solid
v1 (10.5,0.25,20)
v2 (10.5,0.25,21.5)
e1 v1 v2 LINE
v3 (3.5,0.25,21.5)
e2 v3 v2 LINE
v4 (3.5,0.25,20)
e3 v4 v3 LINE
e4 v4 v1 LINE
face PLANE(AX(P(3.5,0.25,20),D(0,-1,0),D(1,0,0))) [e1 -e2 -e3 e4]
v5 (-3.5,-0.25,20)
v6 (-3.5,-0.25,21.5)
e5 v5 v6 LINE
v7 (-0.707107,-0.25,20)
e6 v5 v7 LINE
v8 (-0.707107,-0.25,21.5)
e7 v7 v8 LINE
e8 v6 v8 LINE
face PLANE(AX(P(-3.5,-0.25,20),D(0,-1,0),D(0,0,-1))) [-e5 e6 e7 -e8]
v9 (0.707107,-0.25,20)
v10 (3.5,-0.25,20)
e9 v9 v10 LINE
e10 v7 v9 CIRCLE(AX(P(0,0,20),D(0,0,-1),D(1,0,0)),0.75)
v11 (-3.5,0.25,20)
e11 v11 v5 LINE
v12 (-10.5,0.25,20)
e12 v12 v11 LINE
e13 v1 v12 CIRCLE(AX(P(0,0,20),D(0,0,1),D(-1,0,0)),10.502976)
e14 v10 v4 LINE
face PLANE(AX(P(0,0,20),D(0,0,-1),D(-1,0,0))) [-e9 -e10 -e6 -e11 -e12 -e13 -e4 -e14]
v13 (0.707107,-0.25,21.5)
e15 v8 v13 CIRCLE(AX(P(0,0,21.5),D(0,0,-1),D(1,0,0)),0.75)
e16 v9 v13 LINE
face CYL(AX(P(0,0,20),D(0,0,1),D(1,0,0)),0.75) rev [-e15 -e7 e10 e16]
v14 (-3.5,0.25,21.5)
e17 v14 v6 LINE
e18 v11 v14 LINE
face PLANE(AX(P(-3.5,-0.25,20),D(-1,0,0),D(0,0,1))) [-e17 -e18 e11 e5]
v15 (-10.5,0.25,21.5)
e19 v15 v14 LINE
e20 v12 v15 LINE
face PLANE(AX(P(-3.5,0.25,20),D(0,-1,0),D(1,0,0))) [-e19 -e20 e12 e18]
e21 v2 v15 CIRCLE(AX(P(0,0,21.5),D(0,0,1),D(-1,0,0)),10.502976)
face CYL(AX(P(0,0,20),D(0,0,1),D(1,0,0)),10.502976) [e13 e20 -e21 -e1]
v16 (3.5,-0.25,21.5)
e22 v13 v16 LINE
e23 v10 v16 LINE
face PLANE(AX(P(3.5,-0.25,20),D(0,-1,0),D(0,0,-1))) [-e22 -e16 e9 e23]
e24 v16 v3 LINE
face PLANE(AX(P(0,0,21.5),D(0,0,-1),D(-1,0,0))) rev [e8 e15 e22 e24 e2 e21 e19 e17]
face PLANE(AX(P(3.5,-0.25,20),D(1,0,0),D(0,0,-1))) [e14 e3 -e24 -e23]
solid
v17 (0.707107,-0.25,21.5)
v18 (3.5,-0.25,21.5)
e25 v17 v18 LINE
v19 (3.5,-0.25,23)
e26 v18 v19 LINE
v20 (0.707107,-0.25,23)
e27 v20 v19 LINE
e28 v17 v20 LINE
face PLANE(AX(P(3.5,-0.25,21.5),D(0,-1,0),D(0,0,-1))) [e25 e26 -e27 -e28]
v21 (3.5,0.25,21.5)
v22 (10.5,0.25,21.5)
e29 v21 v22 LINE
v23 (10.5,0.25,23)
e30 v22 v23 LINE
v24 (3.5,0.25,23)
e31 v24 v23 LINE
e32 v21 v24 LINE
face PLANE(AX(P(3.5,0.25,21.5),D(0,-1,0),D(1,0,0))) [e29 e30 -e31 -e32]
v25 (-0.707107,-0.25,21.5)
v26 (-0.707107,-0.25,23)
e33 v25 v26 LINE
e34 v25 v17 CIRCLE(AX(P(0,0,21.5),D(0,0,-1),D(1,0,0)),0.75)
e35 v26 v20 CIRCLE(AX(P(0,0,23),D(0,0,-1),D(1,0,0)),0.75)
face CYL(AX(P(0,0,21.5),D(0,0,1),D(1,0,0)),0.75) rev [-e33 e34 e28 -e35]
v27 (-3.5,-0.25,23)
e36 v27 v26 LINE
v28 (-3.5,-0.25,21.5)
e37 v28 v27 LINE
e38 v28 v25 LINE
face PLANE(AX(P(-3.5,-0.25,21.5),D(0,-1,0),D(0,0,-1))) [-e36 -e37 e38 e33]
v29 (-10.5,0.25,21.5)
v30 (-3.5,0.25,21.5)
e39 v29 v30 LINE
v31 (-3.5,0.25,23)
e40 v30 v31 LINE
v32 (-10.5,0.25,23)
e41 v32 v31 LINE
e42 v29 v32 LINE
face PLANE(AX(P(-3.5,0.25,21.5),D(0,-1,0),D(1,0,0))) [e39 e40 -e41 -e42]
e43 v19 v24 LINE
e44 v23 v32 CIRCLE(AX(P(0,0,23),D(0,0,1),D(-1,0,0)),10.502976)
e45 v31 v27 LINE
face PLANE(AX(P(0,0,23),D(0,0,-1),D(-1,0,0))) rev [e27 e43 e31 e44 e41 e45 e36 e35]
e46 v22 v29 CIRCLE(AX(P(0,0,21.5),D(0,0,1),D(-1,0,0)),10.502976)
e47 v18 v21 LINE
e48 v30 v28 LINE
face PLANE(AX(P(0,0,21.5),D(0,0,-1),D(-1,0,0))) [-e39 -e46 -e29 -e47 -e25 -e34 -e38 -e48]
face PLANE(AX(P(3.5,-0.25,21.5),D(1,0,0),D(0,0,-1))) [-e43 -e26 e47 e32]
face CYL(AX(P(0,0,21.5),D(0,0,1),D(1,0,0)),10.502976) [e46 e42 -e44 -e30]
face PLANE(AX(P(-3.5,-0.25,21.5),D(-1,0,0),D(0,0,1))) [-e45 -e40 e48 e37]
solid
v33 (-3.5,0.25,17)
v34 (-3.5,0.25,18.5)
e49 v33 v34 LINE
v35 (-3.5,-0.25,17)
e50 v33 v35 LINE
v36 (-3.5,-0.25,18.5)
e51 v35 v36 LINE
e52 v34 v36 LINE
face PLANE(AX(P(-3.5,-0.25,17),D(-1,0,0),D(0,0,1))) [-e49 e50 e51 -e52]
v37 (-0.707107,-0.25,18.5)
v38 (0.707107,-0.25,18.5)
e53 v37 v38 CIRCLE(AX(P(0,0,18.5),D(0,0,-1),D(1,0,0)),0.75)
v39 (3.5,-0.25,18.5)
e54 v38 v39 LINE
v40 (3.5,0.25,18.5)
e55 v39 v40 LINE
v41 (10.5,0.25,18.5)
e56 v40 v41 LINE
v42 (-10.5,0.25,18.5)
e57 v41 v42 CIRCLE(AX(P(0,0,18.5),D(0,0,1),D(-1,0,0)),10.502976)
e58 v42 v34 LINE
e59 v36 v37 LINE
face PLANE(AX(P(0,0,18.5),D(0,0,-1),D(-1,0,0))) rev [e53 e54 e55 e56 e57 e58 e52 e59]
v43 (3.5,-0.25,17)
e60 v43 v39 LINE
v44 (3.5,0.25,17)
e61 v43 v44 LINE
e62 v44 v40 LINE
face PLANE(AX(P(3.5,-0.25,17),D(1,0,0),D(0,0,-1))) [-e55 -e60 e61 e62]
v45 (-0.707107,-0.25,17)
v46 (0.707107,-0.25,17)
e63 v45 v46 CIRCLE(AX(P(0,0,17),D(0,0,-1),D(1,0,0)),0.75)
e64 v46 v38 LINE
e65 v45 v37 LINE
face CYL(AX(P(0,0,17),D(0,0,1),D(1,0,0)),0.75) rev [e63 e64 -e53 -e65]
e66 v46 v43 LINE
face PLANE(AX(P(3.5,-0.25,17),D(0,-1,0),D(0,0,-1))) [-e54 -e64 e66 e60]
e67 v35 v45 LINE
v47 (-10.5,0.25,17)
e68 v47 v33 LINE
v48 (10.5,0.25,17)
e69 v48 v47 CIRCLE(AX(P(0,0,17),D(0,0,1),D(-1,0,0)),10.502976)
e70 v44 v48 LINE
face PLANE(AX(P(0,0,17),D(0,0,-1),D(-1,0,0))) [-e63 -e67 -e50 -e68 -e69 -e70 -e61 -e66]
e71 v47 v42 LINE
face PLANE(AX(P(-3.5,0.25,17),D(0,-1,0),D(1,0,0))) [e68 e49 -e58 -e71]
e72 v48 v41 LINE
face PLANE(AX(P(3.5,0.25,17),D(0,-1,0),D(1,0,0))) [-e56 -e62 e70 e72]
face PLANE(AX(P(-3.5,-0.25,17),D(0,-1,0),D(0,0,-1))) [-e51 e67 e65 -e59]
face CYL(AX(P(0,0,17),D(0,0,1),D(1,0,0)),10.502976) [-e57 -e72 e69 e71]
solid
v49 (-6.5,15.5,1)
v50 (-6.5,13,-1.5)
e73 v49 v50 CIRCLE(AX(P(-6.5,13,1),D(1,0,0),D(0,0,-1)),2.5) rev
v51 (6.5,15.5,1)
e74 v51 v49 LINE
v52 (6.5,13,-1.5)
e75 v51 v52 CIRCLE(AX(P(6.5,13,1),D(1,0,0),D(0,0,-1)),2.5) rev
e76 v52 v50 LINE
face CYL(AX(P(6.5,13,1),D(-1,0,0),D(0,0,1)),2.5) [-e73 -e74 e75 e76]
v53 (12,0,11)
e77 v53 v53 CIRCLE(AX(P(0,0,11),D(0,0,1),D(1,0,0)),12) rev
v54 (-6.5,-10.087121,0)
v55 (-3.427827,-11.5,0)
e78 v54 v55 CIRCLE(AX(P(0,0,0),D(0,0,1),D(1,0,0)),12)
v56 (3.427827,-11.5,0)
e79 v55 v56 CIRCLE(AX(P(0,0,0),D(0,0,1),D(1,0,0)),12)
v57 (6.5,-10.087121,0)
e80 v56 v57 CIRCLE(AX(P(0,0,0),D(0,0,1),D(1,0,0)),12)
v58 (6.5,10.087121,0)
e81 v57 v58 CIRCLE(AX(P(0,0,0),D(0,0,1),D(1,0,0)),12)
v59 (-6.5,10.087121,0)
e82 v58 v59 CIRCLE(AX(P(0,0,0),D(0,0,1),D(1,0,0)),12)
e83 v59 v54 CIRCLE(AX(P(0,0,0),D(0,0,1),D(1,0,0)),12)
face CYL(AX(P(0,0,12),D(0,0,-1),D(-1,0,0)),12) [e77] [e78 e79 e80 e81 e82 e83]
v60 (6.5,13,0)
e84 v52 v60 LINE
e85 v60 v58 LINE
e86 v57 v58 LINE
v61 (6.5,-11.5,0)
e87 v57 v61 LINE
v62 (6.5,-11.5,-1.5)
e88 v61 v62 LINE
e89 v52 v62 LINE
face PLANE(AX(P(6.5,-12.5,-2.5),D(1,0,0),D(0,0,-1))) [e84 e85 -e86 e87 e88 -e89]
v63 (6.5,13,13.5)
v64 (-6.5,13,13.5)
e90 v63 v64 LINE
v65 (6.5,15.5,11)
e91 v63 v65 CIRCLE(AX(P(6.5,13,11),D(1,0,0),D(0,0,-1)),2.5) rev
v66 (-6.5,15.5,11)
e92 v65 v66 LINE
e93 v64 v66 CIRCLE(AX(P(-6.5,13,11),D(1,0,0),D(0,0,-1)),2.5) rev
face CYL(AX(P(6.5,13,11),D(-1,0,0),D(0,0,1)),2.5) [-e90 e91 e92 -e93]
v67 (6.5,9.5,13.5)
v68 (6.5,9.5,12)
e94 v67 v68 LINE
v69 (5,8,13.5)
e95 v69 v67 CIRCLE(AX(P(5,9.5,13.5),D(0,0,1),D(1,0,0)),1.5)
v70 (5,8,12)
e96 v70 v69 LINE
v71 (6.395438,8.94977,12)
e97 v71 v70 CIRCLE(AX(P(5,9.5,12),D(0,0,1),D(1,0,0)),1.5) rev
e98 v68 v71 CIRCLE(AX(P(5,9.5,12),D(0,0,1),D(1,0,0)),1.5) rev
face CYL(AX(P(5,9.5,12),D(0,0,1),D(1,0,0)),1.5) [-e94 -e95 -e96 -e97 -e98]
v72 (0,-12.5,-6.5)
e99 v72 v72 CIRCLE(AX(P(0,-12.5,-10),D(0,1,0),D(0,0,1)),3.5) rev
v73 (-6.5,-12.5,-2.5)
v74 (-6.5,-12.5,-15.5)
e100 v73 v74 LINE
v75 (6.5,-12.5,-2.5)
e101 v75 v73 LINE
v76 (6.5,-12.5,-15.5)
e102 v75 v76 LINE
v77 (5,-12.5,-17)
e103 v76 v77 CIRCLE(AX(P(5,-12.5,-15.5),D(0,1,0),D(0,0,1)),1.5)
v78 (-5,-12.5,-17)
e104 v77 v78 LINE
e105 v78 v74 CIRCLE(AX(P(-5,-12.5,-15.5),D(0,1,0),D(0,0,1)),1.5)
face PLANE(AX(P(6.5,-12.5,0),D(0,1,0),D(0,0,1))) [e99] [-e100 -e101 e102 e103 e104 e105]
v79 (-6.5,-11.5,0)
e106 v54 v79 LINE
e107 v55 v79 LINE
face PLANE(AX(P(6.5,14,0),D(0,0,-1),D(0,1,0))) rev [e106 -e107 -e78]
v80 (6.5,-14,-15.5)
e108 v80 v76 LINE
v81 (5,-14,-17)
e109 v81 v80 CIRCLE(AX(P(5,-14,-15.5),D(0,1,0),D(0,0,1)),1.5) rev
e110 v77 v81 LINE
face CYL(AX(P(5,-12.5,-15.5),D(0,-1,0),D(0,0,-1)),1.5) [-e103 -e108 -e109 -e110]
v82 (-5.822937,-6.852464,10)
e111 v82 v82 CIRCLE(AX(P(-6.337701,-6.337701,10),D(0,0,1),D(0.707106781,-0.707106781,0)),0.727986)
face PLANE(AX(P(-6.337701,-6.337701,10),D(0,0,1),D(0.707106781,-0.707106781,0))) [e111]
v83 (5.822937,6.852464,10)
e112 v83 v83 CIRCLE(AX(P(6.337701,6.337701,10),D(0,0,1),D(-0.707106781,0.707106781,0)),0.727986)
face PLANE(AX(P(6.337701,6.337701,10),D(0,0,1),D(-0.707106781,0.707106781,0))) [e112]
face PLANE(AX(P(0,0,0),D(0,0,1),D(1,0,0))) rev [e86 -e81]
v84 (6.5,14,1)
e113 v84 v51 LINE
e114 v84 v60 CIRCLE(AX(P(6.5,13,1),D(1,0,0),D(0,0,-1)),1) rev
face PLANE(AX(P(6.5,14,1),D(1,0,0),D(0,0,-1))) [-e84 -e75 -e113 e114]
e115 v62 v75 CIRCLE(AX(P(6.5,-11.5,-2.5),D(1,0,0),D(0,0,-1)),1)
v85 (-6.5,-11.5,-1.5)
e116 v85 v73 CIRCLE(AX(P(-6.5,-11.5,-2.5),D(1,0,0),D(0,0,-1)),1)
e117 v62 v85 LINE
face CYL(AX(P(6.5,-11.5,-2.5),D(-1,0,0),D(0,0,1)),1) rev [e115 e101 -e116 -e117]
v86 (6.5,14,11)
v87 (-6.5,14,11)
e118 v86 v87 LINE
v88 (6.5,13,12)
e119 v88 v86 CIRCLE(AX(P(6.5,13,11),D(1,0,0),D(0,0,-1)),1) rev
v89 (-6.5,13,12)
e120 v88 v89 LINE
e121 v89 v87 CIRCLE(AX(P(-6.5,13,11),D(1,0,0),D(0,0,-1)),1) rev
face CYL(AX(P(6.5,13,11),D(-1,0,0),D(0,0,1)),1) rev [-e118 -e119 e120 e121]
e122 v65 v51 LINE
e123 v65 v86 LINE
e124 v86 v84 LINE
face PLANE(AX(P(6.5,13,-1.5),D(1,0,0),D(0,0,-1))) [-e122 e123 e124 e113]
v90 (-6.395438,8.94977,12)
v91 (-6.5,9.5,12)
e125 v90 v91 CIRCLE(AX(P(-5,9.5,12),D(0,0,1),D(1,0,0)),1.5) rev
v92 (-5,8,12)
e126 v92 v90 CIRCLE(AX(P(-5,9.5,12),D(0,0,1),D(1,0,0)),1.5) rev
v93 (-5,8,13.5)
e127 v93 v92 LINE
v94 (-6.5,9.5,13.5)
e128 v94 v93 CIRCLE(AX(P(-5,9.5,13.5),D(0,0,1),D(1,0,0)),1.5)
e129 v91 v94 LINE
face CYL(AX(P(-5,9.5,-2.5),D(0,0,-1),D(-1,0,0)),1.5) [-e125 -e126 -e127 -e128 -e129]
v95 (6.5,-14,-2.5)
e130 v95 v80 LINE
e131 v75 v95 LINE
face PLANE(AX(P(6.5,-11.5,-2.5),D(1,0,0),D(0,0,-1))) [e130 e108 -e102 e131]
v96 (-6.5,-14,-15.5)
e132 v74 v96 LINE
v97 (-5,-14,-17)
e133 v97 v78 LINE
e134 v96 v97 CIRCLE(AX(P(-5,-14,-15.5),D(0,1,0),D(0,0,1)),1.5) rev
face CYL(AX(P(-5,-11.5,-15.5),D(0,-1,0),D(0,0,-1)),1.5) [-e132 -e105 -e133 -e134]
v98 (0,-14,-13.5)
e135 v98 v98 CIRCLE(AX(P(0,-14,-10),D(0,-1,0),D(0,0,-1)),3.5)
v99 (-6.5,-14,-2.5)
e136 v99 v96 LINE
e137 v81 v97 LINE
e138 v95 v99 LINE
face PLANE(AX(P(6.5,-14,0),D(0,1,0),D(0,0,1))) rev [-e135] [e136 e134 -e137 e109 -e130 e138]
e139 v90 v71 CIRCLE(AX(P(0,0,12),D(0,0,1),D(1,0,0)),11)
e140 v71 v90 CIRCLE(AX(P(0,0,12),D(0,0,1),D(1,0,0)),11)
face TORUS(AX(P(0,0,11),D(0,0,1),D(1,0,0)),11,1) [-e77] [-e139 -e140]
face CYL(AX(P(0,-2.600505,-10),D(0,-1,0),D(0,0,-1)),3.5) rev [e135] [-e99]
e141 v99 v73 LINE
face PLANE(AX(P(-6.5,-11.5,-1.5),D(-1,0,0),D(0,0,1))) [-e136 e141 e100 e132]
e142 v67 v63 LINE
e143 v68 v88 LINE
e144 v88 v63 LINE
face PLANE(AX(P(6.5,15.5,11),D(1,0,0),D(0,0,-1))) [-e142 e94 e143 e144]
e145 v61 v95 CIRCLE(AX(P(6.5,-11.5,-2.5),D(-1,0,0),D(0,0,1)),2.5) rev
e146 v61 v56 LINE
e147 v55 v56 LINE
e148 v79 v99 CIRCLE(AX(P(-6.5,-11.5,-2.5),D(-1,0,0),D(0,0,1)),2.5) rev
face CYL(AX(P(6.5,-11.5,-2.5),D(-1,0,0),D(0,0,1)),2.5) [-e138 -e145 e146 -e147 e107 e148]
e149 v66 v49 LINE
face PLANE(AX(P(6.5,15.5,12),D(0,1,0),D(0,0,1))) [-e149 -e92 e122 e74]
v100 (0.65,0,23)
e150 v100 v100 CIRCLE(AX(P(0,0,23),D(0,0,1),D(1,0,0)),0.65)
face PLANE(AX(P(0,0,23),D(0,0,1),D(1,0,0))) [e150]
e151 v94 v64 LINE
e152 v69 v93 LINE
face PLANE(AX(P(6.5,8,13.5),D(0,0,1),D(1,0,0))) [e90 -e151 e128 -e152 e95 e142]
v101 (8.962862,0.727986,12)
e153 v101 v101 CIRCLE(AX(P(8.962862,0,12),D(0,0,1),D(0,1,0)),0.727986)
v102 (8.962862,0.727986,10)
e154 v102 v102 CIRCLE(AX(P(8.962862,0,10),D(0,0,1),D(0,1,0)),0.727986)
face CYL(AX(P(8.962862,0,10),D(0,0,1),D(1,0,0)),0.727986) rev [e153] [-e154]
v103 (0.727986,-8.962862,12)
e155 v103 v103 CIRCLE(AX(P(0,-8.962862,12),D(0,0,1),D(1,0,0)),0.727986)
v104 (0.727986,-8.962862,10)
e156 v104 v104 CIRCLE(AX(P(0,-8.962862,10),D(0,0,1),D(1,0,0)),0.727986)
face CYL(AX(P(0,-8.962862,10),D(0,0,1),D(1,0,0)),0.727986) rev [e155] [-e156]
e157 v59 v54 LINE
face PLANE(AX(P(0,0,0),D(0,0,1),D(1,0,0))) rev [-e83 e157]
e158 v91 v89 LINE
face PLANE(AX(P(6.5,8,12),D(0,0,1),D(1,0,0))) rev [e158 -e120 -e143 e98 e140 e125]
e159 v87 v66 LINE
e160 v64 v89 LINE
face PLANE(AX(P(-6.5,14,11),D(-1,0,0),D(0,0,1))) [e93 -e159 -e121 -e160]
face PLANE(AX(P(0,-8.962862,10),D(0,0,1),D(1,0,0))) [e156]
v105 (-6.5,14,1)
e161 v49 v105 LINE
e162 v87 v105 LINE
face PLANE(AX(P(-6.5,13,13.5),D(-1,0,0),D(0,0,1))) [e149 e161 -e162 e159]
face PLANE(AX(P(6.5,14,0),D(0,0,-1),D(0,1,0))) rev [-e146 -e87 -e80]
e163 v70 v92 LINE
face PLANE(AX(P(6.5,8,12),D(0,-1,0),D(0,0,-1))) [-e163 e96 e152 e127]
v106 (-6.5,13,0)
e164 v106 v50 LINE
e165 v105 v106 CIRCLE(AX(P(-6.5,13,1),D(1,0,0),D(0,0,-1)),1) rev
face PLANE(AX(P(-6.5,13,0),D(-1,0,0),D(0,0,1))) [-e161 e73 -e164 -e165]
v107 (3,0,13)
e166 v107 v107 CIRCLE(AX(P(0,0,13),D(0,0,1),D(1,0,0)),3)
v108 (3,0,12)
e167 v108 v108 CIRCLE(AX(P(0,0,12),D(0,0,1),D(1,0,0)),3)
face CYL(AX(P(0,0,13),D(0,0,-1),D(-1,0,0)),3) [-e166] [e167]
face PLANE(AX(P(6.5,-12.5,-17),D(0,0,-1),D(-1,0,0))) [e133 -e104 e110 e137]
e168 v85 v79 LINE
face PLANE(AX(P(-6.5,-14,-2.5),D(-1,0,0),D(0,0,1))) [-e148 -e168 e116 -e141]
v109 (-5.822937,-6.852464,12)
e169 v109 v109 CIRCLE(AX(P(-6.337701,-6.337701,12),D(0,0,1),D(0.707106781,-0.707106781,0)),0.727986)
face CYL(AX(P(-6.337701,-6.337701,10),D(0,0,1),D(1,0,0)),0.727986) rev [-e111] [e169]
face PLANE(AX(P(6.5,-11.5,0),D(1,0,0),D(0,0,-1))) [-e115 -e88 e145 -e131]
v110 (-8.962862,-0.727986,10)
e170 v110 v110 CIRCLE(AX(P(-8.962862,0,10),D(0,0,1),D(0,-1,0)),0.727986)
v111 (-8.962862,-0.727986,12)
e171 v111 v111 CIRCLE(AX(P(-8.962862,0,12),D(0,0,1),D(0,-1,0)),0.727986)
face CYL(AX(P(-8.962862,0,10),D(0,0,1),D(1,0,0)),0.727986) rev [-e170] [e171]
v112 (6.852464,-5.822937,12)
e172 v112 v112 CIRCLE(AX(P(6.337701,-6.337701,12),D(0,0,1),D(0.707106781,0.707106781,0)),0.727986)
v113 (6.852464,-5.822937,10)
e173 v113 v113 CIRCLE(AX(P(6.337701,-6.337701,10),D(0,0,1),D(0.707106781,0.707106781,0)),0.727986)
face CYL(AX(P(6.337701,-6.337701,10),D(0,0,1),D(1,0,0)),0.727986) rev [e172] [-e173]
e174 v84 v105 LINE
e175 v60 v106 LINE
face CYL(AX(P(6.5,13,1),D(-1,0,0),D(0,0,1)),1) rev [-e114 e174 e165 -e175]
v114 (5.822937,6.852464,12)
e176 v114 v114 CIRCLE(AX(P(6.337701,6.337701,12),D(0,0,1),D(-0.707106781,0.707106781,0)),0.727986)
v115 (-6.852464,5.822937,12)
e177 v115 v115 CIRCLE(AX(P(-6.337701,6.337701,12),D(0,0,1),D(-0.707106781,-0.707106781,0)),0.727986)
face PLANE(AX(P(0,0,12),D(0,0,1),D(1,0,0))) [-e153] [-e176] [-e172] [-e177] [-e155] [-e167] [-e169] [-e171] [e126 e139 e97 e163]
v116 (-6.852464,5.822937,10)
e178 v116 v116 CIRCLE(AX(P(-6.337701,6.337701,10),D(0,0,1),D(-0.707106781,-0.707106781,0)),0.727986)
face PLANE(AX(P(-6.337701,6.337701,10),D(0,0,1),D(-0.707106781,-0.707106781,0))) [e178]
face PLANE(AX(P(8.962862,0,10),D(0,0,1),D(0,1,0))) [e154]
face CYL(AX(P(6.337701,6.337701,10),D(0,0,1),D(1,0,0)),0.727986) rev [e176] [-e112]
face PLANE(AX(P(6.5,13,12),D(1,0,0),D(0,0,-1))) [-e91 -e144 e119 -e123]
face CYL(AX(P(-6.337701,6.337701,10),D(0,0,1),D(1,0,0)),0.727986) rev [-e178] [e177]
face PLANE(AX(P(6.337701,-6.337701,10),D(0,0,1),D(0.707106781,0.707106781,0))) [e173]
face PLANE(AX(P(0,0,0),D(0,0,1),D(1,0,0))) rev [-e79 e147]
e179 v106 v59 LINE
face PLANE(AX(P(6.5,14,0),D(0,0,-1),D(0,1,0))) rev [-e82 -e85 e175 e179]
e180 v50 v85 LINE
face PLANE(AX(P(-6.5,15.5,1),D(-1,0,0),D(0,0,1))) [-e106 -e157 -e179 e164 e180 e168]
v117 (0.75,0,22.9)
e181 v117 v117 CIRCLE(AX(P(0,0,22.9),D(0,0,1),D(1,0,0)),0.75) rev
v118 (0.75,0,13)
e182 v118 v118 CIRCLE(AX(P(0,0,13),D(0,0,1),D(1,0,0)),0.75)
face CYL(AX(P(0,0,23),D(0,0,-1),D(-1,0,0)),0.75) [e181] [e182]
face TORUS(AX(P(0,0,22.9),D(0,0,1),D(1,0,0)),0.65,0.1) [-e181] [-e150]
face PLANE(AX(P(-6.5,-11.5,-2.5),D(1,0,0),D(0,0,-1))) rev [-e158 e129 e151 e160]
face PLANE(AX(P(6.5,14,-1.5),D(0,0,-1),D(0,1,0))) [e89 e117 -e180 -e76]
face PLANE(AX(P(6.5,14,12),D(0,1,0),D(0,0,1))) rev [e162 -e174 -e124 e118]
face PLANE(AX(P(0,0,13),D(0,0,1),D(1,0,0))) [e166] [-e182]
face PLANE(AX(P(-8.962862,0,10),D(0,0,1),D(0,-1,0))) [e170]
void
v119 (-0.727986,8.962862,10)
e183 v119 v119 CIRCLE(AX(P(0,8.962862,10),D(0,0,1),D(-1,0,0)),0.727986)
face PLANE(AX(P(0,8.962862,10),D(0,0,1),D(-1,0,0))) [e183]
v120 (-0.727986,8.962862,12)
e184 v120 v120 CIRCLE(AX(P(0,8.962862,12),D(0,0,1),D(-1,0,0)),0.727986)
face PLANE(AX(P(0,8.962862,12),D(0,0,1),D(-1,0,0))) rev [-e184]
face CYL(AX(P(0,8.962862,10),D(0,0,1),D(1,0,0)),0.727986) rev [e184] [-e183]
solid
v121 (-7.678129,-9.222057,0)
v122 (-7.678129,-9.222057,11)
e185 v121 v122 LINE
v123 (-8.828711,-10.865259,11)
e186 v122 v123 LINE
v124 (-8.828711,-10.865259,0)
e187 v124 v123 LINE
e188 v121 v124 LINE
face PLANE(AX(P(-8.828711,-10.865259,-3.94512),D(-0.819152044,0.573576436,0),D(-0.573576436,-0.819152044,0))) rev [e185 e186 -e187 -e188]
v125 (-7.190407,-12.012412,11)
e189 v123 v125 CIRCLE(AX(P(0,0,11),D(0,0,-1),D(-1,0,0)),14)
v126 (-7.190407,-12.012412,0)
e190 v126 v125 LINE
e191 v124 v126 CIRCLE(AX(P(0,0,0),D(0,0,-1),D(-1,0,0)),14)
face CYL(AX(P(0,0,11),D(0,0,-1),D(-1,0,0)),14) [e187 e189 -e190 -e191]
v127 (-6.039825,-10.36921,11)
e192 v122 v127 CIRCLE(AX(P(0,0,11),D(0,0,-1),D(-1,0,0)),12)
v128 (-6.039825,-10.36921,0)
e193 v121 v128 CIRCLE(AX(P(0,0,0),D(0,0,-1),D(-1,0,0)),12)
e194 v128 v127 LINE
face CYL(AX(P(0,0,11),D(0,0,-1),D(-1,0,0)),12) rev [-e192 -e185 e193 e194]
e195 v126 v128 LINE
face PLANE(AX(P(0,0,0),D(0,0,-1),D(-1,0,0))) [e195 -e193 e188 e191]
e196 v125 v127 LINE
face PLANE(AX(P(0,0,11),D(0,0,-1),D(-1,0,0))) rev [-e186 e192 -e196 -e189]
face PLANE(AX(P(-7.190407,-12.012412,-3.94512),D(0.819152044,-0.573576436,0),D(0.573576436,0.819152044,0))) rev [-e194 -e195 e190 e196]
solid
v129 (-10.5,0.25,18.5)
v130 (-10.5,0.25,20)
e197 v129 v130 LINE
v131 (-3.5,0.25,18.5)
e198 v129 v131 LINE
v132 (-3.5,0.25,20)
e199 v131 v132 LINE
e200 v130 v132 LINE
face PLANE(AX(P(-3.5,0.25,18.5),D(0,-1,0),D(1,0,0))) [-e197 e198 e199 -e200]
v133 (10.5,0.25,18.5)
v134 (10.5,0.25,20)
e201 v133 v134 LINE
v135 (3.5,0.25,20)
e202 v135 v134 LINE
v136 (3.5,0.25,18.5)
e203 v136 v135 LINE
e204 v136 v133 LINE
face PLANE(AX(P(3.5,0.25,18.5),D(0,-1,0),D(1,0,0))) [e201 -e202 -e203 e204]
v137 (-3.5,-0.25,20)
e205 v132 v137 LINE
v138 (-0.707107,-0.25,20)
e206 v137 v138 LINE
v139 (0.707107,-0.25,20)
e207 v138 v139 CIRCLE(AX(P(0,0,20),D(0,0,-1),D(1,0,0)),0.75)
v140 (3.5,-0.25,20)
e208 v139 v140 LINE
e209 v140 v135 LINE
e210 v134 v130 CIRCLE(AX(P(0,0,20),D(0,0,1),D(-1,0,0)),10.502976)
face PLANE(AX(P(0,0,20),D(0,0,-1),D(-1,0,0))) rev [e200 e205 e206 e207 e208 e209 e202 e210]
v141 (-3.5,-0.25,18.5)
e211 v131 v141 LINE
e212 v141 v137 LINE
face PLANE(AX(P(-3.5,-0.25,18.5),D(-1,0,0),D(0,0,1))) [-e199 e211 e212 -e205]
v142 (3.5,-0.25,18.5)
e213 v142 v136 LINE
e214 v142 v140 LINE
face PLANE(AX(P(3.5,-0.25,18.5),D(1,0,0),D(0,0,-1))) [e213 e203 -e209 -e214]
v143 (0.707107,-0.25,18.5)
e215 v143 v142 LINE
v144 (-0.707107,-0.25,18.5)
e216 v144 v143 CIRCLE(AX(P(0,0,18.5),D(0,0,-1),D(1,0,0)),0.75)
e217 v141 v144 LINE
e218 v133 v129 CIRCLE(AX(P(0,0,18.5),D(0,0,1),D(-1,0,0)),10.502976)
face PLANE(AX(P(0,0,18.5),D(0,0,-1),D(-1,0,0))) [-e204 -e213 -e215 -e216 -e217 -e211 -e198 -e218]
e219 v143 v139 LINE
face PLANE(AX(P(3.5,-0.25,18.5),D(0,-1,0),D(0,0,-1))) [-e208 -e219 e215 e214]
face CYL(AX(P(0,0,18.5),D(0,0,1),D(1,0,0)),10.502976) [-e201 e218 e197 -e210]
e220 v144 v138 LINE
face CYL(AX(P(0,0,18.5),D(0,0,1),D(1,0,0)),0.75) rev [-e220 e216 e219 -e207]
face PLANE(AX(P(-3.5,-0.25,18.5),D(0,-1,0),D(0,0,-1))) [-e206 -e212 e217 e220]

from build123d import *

# Parameters (mm, degrees)
ESQUISSE1_R                  = 12
BOSS_EXTRU_1_DEPTH           = 12
CONG_1_R                     = 1
ESQUISSE3_R                  = 14
ESQUISSE3_R_2                = 12
BOSS_EXTRU_2_DEPTH           = 11
T_LE_DE_BASE_PLI_E1_DEPTH    = 6.5
CONG_2_R                     = 1.5
ESQUISSE9_R                  = 3.5
ENL_V_MAT_EXTRU_1_DEPTH      = 1.5
ESQUISSE11_R                 = 3
BOSS_EXTRU_3_DEPTH           = 1
ESQUISSE14_R                 = 0.75
BOSS_EXTRU_4_DEPTH           = 10
CONG_3_R                     = 0.1
BOSS_EXTRU_5_DEPTH           = 1.5
R_P_TITION_LIN_AIRE1_COUNT   = 4
R_P_TITION_LIN_AIRE1_PITCH   = 1.5
ENL_V_START                  = -11
ENL_V_MAT_EXTRU_2_DEPTH      = 11
ESQUISSE17_R                 = 0.727985747
ENL_V_MAT_EXTRU_3_DEPTH      = 2
R_P_TITION_CIRCULAIRE1_COUNT = 8


# Sheet-metal steps are written as plain solids
with BuildPart() as part:
    # Esquisse1 → Boss.-Extru.1 (new body)
    with BuildSketch(Plane.XY):
        Circle(ESQUISSE1_R)
    extrude(amount=BOSS_EXTRU_1_DEPTH)

    # Congé1
    cong_1_edges = [part.edges().sort_by_distance(p)[0] for p in [
        (-12, 0, 12),
    ]]
    fillet(cong_1_edges, radius=CONG_1_R)



with BuildPart() as body_2:
    # Esquisse3 → Boss.-Extru.2 (new body)
    with BuildSketch(Plane(origin=(0, 0, 0), x_dir=(-1, 0, 0), z_dir=(0, 0, -1))):
        Circle(ESQUISSE3_R)
        Circle(ESQUISSE3_R_2, mode=Mode.SUBTRACT)
    extrude(amount=-BOSS_EXTRU_2_DEPTH)

    # Esquisse16 → Enlèv. mat.-Extru.2 (cut)
    with BuildSketch(Plane.XY.offset(11).offset(ENL_V_START)):
        with BuildLine():
            Line((-8.828711085, -10.865259342), (-7.678128626, -9.222057298))
            ThreePointArc((-7.678128626, -9.222057298), (-6.882917236, -9.829824531), (-6.039824538, -10.36921017))
            Line((-6.039824538, -10.36921017), (-7.190406996, -12.012412215))
            ThreePointArc((-7.190406996, -12.012412215), (-8.030070109, -11.46812862), (-8.828711085, -10.865259342))
        make_face()
    extrude(amount=ENL_V_MAT_EXTRU_2_DEPTH, mode=Mode.SUBTRACT)


with BuildPart() as body_3:
    # Esquisse4 → Tôle de base pliée1 (new, symmetric)
    with BuildSketch(Plane(origin=(0, 0, 0), x_dir=(0, 0, -1), z_dir=(1, 0, 0))):
        with BuildLine():
            Line((-12, 8), (-12, 13))
            ThreePointArc((-12, 13), (-11.707106781, 13.707106781), (-11, 14))
            Line((-11, 14), (-1, 14))
            ThreePointArc((-1, 14), (-0.292893219, 13.707106781), (0, 13))
            Line((0, 13), (0, -11.5))
            ThreePointArc((0, -11.5), (0.732233047, -13.267766953), (2.5, -14))
            Line((2.5, -14), (17, -14))
            Line((17, -14), (17, -12.5))
            Line((17, -12.5), (2.5, -12.5))
            ThreePointArc((2.5, -12.5), (1.792893219, -12.207106781), (1.5, -11.5))
            Line((1.5, -11.5), (1.5, 13))
            ThreePointArc((1.5, 13), (0.767766953, 14.767766953), (-1, 15.5))
            Line((-1, 15.5), (-11, 15.5))
            ThreePointArc((-11, 15.5), (-12.767766953, 14.767766953), (-13.5, 13))
            Line((-13.5, 13), (-13.5, 8))
            Line((-13.5, 8), (-12, 8))
        make_face()
    extrude(amount=T_LE_DE_BASE_PLI_E1_DEPTH, both=True)

    # Congé2
    cong_2_edges = [body_3.edges().sort_by_distance(p)[0] for p in [
        (-6.5, 8, 12.75),
        (-6.5, -13.25, -17),
        (6.5, 8, 12.75),
        (6.5, -13.25, -17),
    ]]
    fillet(cong_2_edges, radius=CONG_2_R)

    # Esquisse9 → Enlèv. mat.-Extru.1 (cut)
    with BuildSketch(Plane.XZ.offset(14)):
        with Locations(Location((0, -10, 0), (0, 0, 270))):
            Circle(ESQUISSE9_R)
    extrude(amount=-ENL_V_MAT_EXTRU_1_DEPTH, mode=Mode.SUBTRACT)


with BuildPart() as part_1:
    add(part.part)

    add(body_3.part)  # Boss.-Extru.3 merges body 3
    # Esquisse11 → Boss.-Extru.3 (add)
    with BuildSketch(Plane.XY.offset(12)):
        Circle(ESQUISSE11_R)
    extrude(amount=BOSS_EXTRU_3_DEPTH)

    # Esquisse14 → Boss.-Extru.4 (add)
    with BuildSketch(Plane.XY.offset(13)):
        Circle(ESQUISSE14_R)
    extrude(amount=BOSS_EXTRU_4_DEPTH)

    # Congé3
    cong_3_edges = [part_1.edges().sort_by_distance(p)[0] for p in [
        (-0.75, 0, 23),
    ]]
    fillet(cong_3_edges, radius=CONG_3_R)

    # Esquisse17 → Enlèv. mat.-Extru.3 (cut)
    with BuildSketch(Plane.XY.offset(12)):
        with Locations((0, -8.962862468)):
            Circle(ESQUISSE17_R)
    enl_v_mat_extru_3 = extrude(amount=-ENL_V_MAT_EXTRU_3_DEPTH, mode=Mode.SUBTRACT)

    # Répétition circulaire1: Enlèv. mat.-Extru.3 ×8 about axis
    r_p_tition_circulaire1_axis = Axis((0, 0, 0), (0, 0, 1))
    for i in range(1, R_P_TITION_CIRCULAIRE1_COUNT):
        add(enl_v_mat_extru_3.rotate(r_p_tition_circulaire1_axis, i * 360 / R_P_TITION_CIRCULAIRE1_COUNT), mode=Mode.SUBTRACT)


with BuildPart() as body_3_2:
    # Esquisse15 → Boss.-Extru.5 (new body)
    with BuildSketch(Plane.XY.offset(23)):
        with BuildLine():
            Line((-3.5, -0.25), (-0.707106781, -0.25))
            ThreePointArc((-0.707106781, -0.25), (0, 0.75), (0.707106781, -0.25))
            Line((0.707106781, -0.25), (3.5, -0.25))
            Line((3.5, -0.25), (3.5, 0.25))
            Line((3.5, 0.25), (10.5, 0.25))
            ThreePointArc((10.5, 0.25), (0, 10.502975769), (-10.5, 0.25))
            Line((-10.5, 0.25), (-3.5, 0.25))
            Line((-3.5, 0.25), (-3.5, -0.25))
        make_face()
    extrude(amount=-BOSS_EXTRU_5_DEPTH)


with BuildPart() as r_p_tition_lin_aire1_1:
    # Répétition linéaire1: pattern copy
    add(body_3_2.part.moved(Location(Vector(0, 0, -1) * (1 * R_P_TITION_LIN_AIRE1_PITCH))))


with BuildPart() as r_p_tition_lin_aire1_2:
    # Répétition linéaire1: pattern copy
    add(body_3_2.part.moved(Location(Vector(0, 0, -1) * (2 * R_P_TITION_LIN_AIRE1_PITCH))))


with BuildPart() as r_p_tition_lin_aire1_3:
    # Répétition linéaire1: pattern copy
    add(body_3_2.part.moved(Location(Vector(0, 0, -1) * (3 * R_P_TITION_LIN_AIRE1_PITCH))))


solid = Compound([body_2.part, part_1.part, body_3_2.part, r_p_tition_lin_aire1_1.part, r_p_tition_lin_aire1_2.part, r_p_tition_lin_aire1_3.part])
